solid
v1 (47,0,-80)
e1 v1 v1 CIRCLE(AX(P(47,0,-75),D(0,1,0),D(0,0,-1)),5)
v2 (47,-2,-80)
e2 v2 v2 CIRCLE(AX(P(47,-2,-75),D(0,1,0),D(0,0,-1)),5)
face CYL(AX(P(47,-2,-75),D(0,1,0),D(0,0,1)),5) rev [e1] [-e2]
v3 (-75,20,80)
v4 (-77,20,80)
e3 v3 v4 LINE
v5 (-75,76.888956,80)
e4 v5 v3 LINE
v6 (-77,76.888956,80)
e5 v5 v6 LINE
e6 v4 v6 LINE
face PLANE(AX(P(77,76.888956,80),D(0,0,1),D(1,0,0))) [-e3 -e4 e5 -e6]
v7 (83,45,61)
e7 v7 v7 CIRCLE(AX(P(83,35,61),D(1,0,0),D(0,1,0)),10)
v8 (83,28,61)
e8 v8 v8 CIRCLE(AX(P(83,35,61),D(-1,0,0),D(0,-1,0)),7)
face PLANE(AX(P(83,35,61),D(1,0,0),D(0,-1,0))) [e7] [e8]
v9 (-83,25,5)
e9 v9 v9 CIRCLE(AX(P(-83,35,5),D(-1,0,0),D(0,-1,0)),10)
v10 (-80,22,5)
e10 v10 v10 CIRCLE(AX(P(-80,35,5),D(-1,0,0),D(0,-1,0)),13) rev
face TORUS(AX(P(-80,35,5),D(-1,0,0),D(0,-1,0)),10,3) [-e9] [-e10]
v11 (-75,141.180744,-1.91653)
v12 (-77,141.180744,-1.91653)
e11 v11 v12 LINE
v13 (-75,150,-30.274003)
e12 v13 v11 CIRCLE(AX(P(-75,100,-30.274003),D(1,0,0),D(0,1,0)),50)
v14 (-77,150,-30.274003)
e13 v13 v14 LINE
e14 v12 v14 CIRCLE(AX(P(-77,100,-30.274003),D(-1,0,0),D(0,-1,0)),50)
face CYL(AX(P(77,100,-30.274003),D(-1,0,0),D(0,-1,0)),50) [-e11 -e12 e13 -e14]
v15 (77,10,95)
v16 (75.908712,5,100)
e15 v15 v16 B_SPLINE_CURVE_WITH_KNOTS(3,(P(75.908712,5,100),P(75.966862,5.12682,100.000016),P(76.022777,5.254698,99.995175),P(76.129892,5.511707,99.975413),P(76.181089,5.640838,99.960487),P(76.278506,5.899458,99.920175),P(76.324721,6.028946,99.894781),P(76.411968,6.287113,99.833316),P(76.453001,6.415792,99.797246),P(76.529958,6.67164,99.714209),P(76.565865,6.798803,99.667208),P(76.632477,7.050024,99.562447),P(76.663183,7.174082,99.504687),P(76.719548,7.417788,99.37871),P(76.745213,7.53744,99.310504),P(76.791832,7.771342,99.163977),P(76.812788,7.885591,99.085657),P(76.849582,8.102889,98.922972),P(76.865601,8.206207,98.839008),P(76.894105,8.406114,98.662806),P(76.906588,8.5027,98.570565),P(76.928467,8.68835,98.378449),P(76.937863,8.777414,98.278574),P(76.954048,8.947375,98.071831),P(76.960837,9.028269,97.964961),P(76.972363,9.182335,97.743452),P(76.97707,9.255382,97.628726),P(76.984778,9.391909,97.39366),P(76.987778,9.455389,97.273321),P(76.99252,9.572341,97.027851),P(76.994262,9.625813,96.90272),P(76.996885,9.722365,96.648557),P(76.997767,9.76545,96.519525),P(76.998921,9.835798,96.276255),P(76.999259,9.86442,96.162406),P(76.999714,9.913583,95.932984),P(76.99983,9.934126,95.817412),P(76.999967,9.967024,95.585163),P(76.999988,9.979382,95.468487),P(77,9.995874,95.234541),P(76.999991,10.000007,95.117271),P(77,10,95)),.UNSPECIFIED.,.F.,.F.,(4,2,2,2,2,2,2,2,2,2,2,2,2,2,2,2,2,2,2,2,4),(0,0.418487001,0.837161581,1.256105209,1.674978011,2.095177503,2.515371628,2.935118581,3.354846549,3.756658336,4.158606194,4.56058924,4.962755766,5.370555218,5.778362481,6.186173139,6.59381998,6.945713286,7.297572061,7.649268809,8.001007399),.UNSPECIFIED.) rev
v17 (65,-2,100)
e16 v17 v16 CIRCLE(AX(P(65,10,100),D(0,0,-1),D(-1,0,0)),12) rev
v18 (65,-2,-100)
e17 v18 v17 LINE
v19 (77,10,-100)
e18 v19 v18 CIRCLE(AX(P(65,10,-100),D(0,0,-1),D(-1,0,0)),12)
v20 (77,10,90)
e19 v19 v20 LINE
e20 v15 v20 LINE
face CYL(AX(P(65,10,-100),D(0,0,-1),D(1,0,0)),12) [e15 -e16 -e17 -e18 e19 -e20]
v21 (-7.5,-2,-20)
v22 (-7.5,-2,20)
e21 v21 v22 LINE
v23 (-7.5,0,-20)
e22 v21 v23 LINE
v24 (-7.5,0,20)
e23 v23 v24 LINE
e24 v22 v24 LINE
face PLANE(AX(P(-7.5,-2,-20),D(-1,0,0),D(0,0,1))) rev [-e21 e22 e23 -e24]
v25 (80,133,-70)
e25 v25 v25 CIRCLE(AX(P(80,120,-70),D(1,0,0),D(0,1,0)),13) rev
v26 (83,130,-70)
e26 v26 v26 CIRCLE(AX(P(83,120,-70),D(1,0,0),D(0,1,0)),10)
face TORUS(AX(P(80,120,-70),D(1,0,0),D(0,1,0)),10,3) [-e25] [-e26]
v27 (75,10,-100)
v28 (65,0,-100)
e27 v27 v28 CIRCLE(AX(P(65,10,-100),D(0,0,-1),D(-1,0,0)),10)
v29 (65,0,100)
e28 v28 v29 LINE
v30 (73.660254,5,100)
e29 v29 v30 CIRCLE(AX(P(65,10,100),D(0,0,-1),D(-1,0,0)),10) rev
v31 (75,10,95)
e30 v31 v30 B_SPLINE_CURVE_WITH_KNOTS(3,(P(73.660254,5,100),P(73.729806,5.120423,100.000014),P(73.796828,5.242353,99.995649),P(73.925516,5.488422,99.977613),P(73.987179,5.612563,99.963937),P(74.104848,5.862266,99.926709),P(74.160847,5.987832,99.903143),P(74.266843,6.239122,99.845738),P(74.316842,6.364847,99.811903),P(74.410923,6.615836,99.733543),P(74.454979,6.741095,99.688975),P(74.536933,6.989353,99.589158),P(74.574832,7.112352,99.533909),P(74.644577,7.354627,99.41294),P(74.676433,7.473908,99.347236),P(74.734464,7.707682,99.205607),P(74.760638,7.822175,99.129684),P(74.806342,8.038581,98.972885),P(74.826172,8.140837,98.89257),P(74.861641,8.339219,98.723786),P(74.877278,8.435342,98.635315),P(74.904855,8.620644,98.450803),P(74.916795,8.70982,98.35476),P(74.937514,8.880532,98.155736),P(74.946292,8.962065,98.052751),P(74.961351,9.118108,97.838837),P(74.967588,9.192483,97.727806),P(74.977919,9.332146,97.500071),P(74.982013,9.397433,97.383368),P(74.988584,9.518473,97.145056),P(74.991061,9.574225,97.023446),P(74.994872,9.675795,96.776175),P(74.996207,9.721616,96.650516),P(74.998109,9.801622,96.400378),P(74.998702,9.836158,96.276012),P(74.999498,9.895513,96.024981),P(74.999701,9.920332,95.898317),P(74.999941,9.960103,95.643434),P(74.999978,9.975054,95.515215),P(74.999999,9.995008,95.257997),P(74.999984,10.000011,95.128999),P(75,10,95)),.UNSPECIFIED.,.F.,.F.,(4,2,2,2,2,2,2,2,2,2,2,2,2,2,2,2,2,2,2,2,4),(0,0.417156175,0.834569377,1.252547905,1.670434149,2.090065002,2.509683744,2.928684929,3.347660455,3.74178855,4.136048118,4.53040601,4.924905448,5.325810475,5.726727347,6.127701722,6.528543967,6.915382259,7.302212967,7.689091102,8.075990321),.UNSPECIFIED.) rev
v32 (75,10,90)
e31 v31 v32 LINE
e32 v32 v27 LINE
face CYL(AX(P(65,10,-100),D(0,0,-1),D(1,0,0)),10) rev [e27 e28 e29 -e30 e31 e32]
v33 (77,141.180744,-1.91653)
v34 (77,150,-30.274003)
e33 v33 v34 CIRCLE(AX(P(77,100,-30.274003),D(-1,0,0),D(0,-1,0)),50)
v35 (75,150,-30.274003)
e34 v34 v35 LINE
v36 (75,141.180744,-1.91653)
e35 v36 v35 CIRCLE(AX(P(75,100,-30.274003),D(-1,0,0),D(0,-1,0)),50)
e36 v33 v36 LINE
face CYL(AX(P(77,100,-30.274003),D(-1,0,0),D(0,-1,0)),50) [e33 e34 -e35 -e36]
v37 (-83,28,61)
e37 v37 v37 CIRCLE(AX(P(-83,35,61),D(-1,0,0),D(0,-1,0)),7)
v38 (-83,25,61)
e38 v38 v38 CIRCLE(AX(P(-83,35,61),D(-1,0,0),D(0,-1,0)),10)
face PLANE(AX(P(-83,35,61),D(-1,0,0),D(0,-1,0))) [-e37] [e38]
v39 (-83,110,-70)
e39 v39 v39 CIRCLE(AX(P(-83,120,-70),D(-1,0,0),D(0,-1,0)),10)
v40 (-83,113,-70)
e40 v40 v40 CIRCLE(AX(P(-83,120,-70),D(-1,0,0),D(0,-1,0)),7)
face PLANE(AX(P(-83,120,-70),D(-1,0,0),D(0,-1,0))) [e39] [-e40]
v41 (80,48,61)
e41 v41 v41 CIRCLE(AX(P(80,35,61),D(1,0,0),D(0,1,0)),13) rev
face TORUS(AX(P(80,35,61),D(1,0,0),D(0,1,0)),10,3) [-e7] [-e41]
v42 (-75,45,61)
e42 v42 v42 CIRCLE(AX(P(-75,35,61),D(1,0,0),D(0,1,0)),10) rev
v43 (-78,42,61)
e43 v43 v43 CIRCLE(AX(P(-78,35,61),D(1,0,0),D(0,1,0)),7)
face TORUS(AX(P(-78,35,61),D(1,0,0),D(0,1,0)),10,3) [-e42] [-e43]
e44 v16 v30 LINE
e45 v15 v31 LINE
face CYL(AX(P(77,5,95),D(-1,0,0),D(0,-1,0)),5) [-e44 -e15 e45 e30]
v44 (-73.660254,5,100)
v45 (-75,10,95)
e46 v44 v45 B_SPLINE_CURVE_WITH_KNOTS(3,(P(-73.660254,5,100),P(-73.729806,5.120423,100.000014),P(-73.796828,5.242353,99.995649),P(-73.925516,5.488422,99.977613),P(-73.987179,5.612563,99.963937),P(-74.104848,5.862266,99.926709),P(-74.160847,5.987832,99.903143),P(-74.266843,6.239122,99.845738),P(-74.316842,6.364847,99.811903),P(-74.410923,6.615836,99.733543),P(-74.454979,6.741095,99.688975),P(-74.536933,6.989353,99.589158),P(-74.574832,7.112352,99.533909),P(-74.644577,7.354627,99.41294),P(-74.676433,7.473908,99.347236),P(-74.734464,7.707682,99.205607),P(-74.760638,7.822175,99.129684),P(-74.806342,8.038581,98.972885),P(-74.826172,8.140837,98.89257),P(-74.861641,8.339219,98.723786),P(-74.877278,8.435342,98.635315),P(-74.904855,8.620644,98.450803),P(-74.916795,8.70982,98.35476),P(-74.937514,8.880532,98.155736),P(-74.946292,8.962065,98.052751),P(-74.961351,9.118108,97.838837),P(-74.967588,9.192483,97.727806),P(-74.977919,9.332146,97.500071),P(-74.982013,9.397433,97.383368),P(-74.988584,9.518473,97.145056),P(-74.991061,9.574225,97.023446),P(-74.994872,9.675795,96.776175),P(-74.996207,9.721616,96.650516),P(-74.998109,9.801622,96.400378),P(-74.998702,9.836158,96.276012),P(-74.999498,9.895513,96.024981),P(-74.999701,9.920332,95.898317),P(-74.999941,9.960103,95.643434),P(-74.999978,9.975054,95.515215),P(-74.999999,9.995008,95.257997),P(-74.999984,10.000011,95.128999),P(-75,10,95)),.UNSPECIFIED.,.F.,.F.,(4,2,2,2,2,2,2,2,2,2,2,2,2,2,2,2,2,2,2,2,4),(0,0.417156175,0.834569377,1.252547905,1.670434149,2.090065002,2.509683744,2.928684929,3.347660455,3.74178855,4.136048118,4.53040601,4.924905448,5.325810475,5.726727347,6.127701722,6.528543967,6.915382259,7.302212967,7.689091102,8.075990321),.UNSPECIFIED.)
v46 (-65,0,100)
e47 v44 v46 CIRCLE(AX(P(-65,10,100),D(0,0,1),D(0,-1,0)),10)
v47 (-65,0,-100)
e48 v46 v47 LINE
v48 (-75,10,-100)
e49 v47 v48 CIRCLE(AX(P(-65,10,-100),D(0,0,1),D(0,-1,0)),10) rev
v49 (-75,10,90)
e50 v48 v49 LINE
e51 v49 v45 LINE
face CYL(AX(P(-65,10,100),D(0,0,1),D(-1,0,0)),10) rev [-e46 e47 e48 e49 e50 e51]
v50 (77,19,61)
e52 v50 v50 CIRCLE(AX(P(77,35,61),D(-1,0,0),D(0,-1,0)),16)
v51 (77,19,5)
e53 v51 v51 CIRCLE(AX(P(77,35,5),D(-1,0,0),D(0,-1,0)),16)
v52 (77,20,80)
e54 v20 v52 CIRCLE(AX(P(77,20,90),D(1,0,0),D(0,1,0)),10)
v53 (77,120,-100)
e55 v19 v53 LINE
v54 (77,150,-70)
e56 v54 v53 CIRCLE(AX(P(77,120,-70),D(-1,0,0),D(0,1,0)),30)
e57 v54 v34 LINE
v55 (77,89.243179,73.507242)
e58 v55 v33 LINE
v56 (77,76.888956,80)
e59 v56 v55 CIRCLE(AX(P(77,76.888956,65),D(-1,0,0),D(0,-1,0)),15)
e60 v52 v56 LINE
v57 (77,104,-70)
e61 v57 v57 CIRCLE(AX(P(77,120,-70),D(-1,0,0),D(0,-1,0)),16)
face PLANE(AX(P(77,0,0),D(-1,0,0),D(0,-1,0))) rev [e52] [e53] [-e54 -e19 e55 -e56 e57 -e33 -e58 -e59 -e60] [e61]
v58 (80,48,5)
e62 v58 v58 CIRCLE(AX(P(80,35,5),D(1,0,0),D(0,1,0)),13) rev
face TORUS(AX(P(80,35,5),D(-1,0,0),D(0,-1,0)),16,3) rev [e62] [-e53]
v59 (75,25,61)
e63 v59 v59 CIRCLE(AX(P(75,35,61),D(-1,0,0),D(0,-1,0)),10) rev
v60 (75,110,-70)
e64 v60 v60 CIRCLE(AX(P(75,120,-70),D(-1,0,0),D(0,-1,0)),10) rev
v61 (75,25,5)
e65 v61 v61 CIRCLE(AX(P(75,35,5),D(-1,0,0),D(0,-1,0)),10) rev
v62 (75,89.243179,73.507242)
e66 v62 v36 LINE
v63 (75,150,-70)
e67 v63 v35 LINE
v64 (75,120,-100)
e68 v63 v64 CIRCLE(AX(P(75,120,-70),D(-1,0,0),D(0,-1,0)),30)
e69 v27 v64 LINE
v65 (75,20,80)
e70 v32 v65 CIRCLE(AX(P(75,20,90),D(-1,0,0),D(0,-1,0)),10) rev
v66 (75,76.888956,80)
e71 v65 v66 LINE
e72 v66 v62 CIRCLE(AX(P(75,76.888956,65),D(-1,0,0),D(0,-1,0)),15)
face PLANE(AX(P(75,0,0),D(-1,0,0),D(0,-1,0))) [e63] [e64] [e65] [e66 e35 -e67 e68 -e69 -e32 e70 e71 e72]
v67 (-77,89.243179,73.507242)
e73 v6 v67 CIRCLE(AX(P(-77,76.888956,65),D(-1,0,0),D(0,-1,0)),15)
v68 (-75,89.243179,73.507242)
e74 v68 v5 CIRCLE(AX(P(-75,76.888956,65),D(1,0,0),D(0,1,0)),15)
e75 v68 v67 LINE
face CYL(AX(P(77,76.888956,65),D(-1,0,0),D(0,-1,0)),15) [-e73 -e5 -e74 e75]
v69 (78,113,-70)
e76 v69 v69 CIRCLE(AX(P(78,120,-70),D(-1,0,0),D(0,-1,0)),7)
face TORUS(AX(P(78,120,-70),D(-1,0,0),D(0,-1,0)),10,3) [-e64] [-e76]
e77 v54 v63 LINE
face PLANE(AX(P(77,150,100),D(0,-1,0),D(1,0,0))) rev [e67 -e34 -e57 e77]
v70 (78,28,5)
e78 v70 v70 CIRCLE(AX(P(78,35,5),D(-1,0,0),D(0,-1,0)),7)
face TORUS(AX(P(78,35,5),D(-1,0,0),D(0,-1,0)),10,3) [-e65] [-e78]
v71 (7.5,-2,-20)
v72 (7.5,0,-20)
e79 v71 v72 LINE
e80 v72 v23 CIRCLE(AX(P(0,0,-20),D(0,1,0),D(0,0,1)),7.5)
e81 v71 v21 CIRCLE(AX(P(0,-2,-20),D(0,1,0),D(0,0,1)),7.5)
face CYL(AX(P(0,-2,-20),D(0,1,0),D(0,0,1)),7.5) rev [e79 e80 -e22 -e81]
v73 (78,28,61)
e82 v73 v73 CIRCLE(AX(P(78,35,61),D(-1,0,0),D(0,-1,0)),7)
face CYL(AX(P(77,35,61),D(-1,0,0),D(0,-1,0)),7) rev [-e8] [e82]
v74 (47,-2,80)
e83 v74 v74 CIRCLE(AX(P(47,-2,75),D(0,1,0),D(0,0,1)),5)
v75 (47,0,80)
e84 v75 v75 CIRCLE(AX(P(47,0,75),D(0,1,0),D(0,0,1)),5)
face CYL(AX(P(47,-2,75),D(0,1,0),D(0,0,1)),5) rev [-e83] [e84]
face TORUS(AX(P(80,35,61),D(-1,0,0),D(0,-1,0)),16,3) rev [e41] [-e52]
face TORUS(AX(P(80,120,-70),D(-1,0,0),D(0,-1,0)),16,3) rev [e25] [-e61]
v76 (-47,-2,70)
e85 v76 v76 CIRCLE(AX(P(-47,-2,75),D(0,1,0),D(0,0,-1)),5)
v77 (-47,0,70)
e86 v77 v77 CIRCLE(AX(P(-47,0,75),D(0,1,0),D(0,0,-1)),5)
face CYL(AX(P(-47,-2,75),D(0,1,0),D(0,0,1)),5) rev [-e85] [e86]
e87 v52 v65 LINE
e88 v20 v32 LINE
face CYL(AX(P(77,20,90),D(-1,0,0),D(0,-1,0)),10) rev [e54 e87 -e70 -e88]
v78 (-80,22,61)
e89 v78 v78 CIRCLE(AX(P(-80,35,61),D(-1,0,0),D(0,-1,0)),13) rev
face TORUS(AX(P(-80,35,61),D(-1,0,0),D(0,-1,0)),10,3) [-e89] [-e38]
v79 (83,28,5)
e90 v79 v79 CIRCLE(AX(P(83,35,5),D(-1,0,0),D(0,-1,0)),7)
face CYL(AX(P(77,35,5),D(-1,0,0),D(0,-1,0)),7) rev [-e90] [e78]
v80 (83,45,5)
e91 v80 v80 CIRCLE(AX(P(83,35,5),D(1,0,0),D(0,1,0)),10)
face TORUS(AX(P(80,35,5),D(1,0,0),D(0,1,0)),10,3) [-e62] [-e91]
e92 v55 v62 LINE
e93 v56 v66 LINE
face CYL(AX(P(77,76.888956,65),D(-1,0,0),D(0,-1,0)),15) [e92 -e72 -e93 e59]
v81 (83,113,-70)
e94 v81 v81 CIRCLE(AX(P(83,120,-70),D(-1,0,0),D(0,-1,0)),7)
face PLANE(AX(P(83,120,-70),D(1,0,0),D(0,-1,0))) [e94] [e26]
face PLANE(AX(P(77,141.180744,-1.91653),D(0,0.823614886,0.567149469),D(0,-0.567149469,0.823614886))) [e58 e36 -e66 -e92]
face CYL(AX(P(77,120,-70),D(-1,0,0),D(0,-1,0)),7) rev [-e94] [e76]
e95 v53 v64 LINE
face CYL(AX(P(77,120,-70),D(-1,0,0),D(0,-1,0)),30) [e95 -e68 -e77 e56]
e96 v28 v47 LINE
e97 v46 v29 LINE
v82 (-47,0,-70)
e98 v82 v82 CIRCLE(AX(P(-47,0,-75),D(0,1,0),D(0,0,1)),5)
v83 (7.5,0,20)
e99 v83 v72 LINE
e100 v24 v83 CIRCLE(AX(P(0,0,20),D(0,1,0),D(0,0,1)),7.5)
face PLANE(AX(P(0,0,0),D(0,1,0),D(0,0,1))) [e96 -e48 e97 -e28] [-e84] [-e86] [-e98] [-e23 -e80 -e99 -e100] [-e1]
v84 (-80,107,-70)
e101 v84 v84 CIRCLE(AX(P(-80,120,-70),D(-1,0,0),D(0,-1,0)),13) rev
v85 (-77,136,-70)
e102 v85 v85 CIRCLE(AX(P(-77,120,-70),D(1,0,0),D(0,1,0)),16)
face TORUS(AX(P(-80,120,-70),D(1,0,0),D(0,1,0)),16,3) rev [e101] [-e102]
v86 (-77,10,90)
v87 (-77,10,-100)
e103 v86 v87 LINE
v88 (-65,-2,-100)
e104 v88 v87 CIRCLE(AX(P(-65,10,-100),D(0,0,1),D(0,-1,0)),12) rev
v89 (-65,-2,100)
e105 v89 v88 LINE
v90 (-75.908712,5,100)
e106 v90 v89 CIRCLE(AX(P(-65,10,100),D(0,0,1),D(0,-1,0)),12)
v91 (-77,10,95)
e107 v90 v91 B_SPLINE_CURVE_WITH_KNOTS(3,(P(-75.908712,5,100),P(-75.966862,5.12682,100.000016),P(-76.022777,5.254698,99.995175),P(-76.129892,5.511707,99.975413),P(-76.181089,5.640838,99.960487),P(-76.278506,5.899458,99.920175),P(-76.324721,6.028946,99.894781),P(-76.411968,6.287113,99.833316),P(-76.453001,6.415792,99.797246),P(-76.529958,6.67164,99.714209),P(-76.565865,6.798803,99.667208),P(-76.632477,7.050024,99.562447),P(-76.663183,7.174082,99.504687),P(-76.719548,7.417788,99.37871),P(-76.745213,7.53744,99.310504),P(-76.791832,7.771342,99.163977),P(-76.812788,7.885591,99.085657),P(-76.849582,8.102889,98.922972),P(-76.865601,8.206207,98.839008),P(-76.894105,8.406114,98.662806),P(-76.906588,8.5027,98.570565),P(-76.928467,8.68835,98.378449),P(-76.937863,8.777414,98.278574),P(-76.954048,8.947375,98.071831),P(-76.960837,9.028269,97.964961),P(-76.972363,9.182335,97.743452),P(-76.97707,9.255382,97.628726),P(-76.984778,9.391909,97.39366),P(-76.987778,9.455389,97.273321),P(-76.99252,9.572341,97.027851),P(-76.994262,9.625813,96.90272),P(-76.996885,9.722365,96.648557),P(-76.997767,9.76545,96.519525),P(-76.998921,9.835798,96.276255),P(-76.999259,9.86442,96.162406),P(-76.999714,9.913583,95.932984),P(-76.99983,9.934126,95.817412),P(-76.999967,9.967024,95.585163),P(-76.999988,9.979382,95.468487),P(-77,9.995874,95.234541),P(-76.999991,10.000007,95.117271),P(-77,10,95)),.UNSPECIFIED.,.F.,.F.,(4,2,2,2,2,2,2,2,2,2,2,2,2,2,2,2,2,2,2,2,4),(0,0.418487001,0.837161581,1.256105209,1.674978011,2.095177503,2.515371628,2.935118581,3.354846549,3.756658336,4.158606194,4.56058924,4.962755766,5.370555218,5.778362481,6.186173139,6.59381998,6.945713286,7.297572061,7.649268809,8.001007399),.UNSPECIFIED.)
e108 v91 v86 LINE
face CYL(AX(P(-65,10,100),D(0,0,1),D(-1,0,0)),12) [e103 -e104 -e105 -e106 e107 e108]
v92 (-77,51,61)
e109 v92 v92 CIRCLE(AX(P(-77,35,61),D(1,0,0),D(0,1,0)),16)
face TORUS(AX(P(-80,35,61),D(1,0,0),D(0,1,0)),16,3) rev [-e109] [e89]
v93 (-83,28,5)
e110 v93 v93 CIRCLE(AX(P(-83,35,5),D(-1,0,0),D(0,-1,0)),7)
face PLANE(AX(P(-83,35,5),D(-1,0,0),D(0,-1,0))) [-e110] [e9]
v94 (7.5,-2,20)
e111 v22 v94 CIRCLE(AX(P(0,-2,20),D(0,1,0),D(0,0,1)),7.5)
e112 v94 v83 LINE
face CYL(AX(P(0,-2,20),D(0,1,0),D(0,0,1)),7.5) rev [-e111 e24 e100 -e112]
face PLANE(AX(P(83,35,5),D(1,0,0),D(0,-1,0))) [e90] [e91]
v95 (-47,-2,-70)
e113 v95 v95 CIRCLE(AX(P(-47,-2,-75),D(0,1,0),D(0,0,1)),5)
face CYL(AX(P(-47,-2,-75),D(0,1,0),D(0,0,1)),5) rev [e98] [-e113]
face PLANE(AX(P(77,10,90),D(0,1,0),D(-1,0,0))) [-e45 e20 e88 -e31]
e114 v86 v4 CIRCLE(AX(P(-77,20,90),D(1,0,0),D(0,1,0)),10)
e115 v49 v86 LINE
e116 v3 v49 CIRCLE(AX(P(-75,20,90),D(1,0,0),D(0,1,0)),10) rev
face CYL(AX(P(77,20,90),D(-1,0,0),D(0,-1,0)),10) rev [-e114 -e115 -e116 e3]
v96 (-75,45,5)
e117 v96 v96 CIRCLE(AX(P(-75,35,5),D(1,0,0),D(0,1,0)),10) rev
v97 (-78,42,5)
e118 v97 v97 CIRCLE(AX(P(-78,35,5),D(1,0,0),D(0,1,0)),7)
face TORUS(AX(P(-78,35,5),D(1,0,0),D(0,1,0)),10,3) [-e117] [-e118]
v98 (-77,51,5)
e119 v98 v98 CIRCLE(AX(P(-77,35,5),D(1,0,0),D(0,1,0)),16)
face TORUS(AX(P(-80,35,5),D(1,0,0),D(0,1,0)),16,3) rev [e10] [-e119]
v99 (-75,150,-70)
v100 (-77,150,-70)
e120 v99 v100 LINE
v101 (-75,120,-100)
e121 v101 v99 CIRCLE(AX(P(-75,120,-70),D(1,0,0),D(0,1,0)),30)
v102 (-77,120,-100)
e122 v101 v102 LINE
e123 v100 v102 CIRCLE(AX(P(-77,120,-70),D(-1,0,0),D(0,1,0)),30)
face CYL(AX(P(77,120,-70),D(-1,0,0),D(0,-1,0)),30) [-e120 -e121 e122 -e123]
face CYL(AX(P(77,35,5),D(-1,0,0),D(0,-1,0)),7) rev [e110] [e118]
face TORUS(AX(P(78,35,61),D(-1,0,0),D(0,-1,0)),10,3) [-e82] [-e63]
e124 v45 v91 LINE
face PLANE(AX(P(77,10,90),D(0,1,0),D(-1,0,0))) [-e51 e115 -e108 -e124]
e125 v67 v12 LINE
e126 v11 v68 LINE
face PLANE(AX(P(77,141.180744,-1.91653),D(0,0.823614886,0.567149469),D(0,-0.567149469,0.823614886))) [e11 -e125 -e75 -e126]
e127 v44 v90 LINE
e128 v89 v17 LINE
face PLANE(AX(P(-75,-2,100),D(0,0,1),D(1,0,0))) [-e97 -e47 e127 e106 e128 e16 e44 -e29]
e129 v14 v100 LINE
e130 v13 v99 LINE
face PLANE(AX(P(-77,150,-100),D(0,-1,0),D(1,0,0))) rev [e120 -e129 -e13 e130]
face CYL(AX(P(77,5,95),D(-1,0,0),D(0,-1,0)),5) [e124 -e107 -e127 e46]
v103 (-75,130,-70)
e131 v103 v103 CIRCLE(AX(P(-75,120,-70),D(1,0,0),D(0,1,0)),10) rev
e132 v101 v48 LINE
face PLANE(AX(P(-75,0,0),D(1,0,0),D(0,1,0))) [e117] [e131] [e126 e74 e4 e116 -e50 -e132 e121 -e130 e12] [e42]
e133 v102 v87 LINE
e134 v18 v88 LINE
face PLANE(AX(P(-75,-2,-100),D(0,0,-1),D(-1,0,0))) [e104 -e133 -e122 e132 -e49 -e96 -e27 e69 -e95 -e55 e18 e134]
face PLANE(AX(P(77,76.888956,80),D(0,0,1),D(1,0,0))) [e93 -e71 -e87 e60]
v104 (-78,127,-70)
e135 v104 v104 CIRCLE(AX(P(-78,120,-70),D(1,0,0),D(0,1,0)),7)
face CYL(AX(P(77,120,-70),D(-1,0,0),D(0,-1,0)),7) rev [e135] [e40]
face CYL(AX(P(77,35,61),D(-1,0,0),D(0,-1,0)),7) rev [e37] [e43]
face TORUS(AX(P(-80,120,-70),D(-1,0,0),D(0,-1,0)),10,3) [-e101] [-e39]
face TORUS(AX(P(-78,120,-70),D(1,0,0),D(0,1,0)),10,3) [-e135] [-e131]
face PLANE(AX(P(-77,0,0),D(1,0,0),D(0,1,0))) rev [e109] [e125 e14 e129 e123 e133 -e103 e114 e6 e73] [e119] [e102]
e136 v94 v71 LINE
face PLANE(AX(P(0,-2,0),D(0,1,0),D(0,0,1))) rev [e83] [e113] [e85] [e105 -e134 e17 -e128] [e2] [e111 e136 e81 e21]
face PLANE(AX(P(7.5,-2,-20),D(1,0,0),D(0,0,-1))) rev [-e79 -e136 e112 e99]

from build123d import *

# Parameters (mm, degrees)
SKETCH1_W                      = 150
SKETCH1_H                      = 200
BASE_FLANGE1_DEPTH             = 2
EDGE_FLANGE1_STRIP_W           = 28
EDGE_FLANGE1_STRIP_H           = 2
EDGE_FLANGE1_STRIP_CUT_DEPTH   = 200
EDGE_FLANGE1_STRIP_2_W         = 28
EDGE_FLANGE1_STRIP_2_H         = 2
EDGE_FLANGE1_STRIP_CUT_2_DEPTH = 200
EDGE_FLANGE1_DEPTH             = 200
EDGE_FLANGE1_BEND_DEPTH        = 200
SKETCH15_OUTSIDE_W             = 260.93
SKETCH15_OUTSIDE_H             = 212.93
SKETCH15_OUTSIDE_R             = 7
CUT_EXTRUDE1_DEPTH             = 238.099135384
SKETCH16_R                     = 5
CUT_EXTRUDE2_DEPTH             = 197.033160551
BOSS_EXTRUDE1_START            = 6
SKETCH17_R                     = 13
SKETCH17_R_2                   = 7
BOSS_EXTRUDE1_DEPTH            = 6
FILLET1_R                      = 3


# Sheet-metal steps are written as plain solids
with BuildPart() as part:
    # Sketch1 → Base-Flange1 (new body)
    with BuildSketch(Plane(origin=(0, 0, 0), x_dir=(1, 0, 0), z_dir=(0, 1, 0))):
        Rectangle(SKETCH1_W, SKETCH1_H)
    extrude(amount=-BASE_FLANGE1_DEPTH)

    # Edge-Flange1 strip (across the edge) → Edge-Flange1 strip cut (cut)
    with BuildSketch(Plane(origin=(75, 0, 100), x_dir=(-1, 0, 0), z_dir=(0, 0, -1))):
        with Locations((-4, -1)):
            Rectangle(EDGE_FLANGE1_STRIP_W, EDGE_FLANGE1_STRIP_H)
    extrude(amount=EDGE_FLANGE1_STRIP_CUT_DEPTH, mode=Mode.SUBTRACT)

    # Edge-Flange1 strip 2 (across the edge) → Edge-Flange1 strip cut 2 (cut)
    with BuildSketch(Plane(origin=(-75, 0, -100), x_dir=(1, 0, 0), z_dir=(0, 0, 1))):
        with Locations((-4, -1)):
            Rectangle(EDGE_FLANGE1_STRIP_2_W, EDGE_FLANGE1_STRIP_2_H)
    extrude(amount=EDGE_FLANGE1_STRIP_CUT_2_DEPTH, mode=Mode.SUBTRACT)

    # Edge-Flange1 section (across the edge) → Edge-Flange1 (add)
    with BuildSketch(Plane(origin=(75, 0, 100), x_dir=(-1, 0, 0), z_dir=(0, 0, -1))):
        with BuildLine():
            Line((-2, 10), (-2, 150))
            Line((-2, 150), (0, 150))
            Line((0, 150), (0, 10))
            ThreePointArc((0, 10), (2.928932188, 2.928932188), (10, 0))
            Line((10, 0), (10, -2))
            ThreePointArc((10, -2), (1.514718626, 1.514718626), (-2, 10))
        make_face()
    extrude(amount=EDGE_FLANGE1_DEPTH)

    # Edge-Flange1 section 2 (across the edge) → Edge-Flange1 bend (add)
    with BuildSketch(Plane(origin=(-75, 0, -100), x_dir=(1, 0, 0), z_dir=(0, 0, 1))):
        with BuildLine():
            Line((-2, 10), (-2, 150))
            Line((-2, 150), (0, 150))
            Line((0, 150), (0, 10))
            ThreePointArc((0, 10), (2.928932188, 2.928932188), (10, 0))
            Line((10, 0), (10, -2))
            ThreePointArc((10, -2), (1.514718626, 1.514718626), (-2, 10))
        make_face()
    extrude(amount=EDGE_FLANGE1_BEND_DEPTH)

    # Sketch15 outside → Cut-Extrude1 (cut, through all)
    # profile 1 of 4: a face of its own
    with BuildSketch(Plane.ZY.offset(77)):
        with Locations((0, 74)):
            Rectangle(SKETCH15_OUTSIDE_W, SKETCH15_OUTSIDE_H)
        with BuildLine():
            Line((-1.916529607, 141.180744276), (73.507242037, 89.243178795))
            ThreePointArc((73.507242037, 89.243178795), (78.277963521, 83.867184852), (80, 76.888955512))
            Line((80, 76.888955512), (80, 20))
            ThreePointArc((80, 20), (82.928932188, 12.928932188), (90, 10))
            Line((90, 10), (95, 10))
            ThreePointArc((95, 10), (98.535533906, 8.535533906), (100, 5))
            Line((100, 5), (100, -2))
            Line((100, -2), (-100, -2))
            Line((-100, -2), (-100, 99))
            Line((-100, 99), (-100, 120))
            ThreePointArc((-100, 120), (-91.213203436, 141.213203436), (-70, 150))
            Line((-70, 150), (-49, 150))
            Line((-49, 150), (-30.274003064, 150))
            ThreePointArc((-30.274003064, 150), (-15.425387199, 147.744304445), (-1.916529607, 141.180744276))
        make_face(mode=Mode.SUBTRACT)
    # profile 2 of 4: a face of its own
    with BuildSketch(Plane.ZY.offset(77)):
        with Locations(Location((61, 35, 0), (0, 0, 270))):
            Circle(SKETCH15_OUTSIDE_R)
    # profile 3 of 4: a face of its own
    with BuildSketch(Plane.ZY.offset(77)):
        with Locations(Location((-70, 120, 0), (0, 0, 270))):
            Circle(SKETCH15_OUTSIDE_R)
    # profile 4 of 4: a face of its own
    with BuildSketch(Plane.ZY.offset(77)):
        with Locations(Location((5, 35, 0), (0, 0, 270))):
            Circle(SKETCH15_OUTSIDE_R)
    extrude(amount=-CUT_EXTRUDE1_DEPTH, mode=Mode.SUBTRACT)

    # Sketch16 → Cut-Extrude2 (cut, through all)
    with BuildSketch(Plane(origin=(0, 0, 0), x_dir=(1, 0, 0), z_dir=(0, 1, 0))):
        with Locations(Location((-47, 75, 0), (0, 0, 270))):
            Circle(SKETCH16_R)
        with Locations(Location((47, 75, 0), (0, 0, 90))):
            Circle(SKETCH16_R)
        with Locations(Location((47, -75, 0), (0, 0, 270))):
            Circle(SKETCH16_R)
        with Locations(Location((-47, -75, 0), (0, 0, 90))):
            Circle(SKETCH16_R)
        with BuildLine():
            Line((7.5, 20), (7.5, -20))
            ThreePointArc((7.5, -20), (0, -27.5), (-7.5, -20))
            Line((-7.5, -20), (-7.5, 20))
            ThreePointArc((-7.5, 20), (0, 27.5), (7.5, 20))
        make_face()
    extrude(amount=-CUT_EXTRUDE2_DEPTH, mode=Mode.SUBTRACT)

    # Sketch17 → Boss-Extrude1 (add)
    # profile 1 of 3: a face of its own
    with BuildSketch(Plane.ZY.offset(77).offset(BOSS_EXTRUDE1_START)):
        with Locations(Location((5, 35, 0), (0, 0, 90))):
            Circle(SKETCH17_R)
        with Locations(Location((5, 35, 0), (0, 0, 270))):
            Circle(SKETCH17_R_2, mode=Mode.SUBTRACT)
    # profile 2 of 3: a face of its own
    with BuildSketch(Plane.ZY.offset(77).offset(BOSS_EXTRUDE1_START)):
        with Locations(Location((61, 35, 0), (0, 0, 90))):
            Circle(SKETCH17_R)
        with Locations(Location((61, 35, 0), (0, 0, 270))):
            Circle(SKETCH17_R_2, mode=Mode.SUBTRACT)
    # profile 3 of 3: a face of its own
    with BuildSketch(Plane.ZY.offset(77).offset(BOSS_EXTRUDE1_START)):
        with Locations(Location((-70, 120, 0), (0, 0, 90))):
            Circle(SKETCH17_R)
        with Locations(Location((-70, 120, 0), (0, 0, 270))):
            Circle(SKETCH17_R_2, mode=Mode.SUBTRACT)
    boss_extrude1 = extrude(amount=-BOSS_EXTRUDE1_DEPTH)

    # Mirror1: Boss-Extrude1 across plane
    add(boss_extrude1.mirror(Plane(origin=(0, 0, 0), x_dir=(0, 0, 1), z_dir=(1, 0, 0))))

    # Fillet1
    fillet1_edges = [part.edges().sort_by_distance(p)[0] for p in [
        (-75, 127, -70),
        (75, 127, -70),
        (-75, 42, 5),
        (75, 42, 5),
        (-75, 42, 61),
        (75, 42, 61),
        (-77, 22, 5),
        (-77, 22, 61),
        (-77, 107, -70),
        (-83, 107, -70),
        (-83, 22, 61),
        (-83, 22, 5),
        (83, 107, -70),
        (77, 107, -70),
        (83, 22, 61),
        (77, 22, 61),
        (83, 22, 5),
        (77, 22, 5),
    ]]
    fillet(fillet1_edges, radius=FILLET1_R - 0.0001)  # a hair under: the kernel refuses the full size


solid = part.part
